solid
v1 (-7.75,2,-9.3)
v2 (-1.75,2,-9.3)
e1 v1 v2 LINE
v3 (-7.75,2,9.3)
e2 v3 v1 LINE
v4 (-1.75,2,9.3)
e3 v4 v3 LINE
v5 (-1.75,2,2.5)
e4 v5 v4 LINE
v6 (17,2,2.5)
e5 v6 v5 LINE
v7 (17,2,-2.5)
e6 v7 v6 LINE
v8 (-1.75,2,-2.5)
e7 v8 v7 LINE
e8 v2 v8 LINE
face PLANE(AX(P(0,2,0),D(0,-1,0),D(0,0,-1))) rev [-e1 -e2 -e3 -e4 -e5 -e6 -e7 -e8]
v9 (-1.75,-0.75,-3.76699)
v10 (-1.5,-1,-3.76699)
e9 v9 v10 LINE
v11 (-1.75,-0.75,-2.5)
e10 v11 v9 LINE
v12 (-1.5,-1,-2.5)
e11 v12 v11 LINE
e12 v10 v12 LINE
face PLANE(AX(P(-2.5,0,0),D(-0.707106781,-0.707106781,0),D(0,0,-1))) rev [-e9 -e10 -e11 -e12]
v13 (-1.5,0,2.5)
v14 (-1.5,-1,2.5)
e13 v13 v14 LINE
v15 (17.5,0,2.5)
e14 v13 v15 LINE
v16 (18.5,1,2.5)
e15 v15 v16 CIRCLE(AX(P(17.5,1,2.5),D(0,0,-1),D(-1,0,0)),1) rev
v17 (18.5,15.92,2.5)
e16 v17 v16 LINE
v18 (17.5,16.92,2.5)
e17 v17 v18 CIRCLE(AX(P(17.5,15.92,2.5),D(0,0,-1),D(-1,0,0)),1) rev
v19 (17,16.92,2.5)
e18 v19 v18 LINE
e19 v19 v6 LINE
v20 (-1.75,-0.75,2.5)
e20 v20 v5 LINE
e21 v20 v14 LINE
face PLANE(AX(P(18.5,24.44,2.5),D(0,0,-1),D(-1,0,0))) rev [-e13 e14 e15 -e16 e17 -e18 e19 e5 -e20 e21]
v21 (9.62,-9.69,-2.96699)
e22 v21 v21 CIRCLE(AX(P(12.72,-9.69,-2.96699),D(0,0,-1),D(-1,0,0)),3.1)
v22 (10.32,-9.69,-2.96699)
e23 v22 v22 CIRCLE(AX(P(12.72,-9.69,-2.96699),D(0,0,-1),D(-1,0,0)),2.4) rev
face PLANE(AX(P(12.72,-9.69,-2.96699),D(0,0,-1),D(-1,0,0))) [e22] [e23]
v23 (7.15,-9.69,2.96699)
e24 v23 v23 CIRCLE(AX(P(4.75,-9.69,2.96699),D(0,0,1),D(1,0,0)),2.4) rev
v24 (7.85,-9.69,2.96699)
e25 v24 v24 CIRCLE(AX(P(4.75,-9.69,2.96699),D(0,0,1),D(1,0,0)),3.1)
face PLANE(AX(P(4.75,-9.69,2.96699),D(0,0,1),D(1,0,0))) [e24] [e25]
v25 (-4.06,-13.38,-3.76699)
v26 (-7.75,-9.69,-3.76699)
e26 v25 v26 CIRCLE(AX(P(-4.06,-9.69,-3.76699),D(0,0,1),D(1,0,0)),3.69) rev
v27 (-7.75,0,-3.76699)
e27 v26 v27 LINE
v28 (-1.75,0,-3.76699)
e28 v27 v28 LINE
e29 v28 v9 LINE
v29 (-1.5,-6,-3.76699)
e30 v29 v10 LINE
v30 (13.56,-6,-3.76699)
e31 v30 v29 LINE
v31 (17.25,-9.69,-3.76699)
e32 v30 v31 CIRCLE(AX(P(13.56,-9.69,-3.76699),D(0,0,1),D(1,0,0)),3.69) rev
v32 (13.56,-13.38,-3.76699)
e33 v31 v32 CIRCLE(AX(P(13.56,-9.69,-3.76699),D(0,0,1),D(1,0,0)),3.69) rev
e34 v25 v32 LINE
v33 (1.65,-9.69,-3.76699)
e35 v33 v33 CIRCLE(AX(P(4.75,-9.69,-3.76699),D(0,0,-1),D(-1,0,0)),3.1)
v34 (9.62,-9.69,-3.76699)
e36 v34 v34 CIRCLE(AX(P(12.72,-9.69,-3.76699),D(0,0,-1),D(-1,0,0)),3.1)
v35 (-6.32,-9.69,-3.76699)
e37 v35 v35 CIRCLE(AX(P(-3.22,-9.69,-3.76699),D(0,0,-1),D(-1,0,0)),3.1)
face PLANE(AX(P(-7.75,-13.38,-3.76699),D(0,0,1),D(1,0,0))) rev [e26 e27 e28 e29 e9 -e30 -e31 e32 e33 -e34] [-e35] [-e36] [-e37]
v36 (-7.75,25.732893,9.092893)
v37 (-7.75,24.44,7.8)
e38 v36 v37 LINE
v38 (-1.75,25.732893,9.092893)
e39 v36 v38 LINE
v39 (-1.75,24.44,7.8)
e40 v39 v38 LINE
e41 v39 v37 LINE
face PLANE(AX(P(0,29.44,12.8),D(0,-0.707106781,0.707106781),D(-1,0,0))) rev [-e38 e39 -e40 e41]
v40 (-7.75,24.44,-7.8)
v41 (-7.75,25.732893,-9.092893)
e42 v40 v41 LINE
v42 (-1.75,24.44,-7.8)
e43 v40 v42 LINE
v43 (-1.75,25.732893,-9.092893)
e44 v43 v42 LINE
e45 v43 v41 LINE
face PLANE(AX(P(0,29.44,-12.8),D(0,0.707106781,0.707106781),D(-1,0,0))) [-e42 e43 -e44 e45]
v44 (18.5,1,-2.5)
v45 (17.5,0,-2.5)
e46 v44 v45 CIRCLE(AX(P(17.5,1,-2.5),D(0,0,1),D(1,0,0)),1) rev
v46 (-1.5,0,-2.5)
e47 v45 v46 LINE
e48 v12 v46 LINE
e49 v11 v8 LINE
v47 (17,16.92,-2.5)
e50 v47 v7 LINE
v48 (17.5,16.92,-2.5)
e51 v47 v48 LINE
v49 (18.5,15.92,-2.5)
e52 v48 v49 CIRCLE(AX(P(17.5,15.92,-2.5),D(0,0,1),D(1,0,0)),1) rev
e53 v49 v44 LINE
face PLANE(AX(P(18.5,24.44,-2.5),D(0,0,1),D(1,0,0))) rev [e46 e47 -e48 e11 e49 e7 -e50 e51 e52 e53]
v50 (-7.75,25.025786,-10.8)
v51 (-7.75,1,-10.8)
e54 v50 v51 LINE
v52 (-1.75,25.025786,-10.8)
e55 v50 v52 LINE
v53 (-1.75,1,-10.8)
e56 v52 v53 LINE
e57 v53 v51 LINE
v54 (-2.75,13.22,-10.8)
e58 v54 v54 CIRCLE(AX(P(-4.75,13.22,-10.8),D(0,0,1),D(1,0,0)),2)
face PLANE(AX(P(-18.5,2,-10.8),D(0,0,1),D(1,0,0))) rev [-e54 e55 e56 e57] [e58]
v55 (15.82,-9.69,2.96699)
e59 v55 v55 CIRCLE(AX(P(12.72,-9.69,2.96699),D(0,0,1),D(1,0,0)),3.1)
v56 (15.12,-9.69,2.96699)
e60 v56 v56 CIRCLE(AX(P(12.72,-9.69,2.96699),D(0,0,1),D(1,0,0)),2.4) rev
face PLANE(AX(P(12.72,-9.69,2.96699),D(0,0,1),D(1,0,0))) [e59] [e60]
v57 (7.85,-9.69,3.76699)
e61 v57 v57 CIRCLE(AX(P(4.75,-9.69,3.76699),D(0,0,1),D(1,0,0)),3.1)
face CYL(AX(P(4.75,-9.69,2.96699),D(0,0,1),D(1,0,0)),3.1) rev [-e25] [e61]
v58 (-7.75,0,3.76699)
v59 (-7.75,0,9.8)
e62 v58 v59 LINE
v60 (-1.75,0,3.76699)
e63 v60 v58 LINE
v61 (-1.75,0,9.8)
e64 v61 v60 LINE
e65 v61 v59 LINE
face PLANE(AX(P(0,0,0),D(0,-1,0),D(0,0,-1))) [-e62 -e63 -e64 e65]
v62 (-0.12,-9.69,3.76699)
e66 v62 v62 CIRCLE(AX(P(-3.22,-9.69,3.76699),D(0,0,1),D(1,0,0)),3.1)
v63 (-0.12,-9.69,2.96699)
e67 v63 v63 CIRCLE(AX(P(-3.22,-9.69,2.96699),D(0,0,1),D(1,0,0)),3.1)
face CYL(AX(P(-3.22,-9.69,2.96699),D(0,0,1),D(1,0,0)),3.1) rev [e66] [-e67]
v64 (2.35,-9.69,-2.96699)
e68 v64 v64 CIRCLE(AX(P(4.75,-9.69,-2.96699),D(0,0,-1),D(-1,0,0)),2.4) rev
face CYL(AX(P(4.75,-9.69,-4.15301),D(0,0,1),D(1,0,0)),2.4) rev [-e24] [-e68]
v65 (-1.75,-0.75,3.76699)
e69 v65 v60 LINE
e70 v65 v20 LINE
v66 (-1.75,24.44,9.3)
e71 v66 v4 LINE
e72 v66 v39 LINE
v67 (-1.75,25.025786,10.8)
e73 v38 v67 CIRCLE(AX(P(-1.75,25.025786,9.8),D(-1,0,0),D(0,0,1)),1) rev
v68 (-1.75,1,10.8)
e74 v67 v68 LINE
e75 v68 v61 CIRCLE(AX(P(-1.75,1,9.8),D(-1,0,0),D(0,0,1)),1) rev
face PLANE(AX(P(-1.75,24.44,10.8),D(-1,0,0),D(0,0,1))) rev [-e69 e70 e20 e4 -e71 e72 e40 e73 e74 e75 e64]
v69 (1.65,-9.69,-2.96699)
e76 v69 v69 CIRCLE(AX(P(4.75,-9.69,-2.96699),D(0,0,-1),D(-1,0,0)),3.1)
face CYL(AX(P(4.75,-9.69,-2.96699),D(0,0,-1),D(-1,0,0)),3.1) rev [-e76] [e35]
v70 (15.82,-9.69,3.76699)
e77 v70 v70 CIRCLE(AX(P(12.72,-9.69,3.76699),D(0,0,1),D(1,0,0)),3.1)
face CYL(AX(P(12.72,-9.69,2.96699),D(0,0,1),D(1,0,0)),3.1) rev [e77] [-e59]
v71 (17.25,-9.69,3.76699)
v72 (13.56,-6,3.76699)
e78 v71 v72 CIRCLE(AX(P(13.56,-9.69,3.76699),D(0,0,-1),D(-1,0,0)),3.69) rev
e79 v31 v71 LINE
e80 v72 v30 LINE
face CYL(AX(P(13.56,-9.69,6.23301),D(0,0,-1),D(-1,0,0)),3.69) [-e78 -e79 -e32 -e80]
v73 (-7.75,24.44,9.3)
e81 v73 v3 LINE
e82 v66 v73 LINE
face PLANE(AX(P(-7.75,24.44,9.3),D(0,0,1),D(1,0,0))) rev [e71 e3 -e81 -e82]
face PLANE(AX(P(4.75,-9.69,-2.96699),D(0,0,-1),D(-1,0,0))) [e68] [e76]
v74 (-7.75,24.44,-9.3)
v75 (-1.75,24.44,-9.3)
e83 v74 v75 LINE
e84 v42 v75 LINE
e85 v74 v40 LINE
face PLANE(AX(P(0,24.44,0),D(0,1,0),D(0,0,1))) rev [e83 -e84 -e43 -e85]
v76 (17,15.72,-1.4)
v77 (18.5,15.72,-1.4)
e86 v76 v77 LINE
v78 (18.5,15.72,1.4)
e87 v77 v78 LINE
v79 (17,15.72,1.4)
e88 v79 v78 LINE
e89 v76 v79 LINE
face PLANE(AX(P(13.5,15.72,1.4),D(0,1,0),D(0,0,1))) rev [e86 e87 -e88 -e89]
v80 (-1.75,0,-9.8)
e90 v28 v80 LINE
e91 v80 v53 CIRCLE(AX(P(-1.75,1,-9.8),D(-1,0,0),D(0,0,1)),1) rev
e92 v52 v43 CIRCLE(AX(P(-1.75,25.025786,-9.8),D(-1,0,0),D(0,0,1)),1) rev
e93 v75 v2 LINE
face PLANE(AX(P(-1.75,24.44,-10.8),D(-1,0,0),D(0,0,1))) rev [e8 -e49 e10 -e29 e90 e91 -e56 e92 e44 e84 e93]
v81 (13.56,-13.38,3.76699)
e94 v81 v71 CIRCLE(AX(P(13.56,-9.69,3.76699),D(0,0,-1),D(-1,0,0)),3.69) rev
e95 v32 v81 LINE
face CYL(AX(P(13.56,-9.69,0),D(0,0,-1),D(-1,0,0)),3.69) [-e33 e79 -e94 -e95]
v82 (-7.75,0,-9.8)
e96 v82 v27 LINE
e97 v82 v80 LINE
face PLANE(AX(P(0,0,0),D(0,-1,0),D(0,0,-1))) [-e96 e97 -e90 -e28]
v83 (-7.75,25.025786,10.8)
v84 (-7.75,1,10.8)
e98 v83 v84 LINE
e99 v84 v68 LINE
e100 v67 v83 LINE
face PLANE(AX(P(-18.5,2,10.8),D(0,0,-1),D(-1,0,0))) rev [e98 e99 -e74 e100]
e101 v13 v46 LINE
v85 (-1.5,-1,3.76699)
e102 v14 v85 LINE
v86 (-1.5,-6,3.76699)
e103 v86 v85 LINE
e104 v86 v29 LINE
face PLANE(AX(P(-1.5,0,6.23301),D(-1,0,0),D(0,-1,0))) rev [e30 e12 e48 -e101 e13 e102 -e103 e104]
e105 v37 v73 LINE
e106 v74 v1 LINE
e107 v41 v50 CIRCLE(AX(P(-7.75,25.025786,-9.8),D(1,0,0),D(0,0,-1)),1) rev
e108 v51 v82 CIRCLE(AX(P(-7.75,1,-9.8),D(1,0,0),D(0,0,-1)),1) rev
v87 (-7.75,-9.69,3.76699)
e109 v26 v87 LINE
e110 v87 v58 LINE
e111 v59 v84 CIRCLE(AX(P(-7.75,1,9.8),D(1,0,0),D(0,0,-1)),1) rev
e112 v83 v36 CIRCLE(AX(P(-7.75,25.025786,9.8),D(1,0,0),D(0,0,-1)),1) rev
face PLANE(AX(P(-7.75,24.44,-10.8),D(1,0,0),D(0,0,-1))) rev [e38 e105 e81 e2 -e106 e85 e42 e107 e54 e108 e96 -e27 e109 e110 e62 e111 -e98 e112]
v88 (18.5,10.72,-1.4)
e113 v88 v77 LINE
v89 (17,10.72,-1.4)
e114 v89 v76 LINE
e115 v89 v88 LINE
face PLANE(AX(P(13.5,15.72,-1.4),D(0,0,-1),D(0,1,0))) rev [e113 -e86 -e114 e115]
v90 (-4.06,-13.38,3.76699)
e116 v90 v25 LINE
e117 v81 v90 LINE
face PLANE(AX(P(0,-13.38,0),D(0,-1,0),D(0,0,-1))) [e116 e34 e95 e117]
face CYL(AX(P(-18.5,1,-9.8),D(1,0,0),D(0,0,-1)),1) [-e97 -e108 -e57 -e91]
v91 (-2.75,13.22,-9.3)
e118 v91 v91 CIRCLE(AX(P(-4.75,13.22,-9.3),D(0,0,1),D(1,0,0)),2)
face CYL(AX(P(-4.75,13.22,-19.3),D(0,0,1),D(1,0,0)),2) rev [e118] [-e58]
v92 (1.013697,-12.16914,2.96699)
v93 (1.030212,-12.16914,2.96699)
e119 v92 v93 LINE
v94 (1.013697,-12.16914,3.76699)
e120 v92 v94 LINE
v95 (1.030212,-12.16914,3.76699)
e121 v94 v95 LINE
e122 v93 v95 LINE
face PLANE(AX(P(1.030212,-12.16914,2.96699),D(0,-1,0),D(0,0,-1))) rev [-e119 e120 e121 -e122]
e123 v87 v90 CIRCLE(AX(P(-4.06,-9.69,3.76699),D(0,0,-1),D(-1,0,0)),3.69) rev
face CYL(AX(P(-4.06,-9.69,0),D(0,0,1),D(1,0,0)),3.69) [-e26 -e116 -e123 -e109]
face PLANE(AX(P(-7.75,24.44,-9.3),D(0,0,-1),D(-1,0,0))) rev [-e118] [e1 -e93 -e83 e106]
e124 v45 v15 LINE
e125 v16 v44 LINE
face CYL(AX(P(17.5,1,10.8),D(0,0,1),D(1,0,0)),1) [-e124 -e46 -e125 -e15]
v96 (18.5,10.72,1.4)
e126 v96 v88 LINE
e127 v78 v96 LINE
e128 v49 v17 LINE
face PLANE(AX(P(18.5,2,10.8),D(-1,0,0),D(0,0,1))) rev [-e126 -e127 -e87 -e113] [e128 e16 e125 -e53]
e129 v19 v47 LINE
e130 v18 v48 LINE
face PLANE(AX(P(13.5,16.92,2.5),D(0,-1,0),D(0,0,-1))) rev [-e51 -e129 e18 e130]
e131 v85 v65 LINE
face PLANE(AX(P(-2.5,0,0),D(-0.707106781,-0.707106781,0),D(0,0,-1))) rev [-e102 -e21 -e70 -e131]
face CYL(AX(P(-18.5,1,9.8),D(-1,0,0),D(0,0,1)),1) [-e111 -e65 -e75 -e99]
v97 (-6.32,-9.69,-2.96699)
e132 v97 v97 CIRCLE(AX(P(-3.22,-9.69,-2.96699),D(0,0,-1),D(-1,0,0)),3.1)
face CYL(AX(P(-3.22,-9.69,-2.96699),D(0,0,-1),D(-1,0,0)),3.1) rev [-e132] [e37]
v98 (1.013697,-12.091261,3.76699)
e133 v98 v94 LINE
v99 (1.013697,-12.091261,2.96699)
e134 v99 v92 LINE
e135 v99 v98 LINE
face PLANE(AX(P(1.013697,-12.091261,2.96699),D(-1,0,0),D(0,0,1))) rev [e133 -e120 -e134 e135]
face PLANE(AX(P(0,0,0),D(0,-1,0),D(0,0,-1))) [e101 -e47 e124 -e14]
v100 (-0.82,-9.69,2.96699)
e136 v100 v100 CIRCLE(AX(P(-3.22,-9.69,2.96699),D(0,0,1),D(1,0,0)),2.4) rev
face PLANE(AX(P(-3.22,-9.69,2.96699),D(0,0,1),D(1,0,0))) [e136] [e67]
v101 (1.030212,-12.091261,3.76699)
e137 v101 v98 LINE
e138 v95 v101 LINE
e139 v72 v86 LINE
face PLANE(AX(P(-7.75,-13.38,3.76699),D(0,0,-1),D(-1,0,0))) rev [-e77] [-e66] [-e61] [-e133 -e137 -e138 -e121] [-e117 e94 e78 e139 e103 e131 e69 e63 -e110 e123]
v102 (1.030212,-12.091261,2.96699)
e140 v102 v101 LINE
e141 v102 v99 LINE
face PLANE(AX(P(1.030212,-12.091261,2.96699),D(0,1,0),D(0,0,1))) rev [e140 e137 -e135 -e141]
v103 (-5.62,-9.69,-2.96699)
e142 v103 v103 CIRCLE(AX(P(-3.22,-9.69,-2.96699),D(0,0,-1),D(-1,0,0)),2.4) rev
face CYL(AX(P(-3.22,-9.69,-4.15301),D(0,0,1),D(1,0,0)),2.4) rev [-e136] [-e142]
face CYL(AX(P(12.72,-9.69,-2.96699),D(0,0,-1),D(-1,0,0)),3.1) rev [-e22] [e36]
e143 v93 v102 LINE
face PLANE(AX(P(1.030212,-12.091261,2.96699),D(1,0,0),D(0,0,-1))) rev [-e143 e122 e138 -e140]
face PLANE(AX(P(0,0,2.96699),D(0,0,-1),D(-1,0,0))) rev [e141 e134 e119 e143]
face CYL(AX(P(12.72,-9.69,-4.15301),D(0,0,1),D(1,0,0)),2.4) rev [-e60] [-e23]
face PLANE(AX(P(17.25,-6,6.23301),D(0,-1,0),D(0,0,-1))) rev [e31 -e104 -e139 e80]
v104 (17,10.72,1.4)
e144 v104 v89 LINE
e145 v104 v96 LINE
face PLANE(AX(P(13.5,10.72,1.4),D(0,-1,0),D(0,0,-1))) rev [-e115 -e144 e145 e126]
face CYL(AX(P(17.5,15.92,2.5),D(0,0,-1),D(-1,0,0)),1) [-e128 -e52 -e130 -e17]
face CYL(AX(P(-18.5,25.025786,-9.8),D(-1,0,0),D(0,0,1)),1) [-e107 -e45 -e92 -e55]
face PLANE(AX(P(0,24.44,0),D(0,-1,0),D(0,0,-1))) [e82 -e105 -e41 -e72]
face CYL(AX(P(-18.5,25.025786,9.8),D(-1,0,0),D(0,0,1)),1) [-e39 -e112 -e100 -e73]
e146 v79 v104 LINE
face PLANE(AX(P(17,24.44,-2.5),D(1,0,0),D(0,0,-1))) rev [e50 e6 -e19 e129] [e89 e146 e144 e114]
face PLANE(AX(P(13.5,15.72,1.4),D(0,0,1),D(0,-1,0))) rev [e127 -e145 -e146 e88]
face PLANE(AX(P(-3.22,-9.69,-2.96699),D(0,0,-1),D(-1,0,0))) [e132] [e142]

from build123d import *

# Parameters (mm, degrees)
SKETCH1_W           = 37
SKETCH1_H           = 21.6
BOSS_EXTRUDE1_DEPTH = 2
SKETCH2_W           = 6
SKETCH2_H           = 1.5
SKETCH2_W_2         = 1.5
SKETCH2_H_2         = 5
BOSS_EXTRUDE2_DEPTH = 22.44
SKETCH3_W           = 6
SKETCH3_H           = 3
BOSS_EXTRUDE3_DEPTH = 5
CHAMFER1_SIZE       = 5
SKETCH4_W           = 6
SKETCH4_H           = 3
BOSS_EXTRUDE4_DEPTH = 5
CHAMFER2_SIZE       = 5
SKETCH6_W           = 5
SKETCH6_H           = 7.52
SKETCH6_W_2         = 2.8
SKETCH6_H_2         = 5
CUT_EXTRUDE1_DEPTH  = 5
SKETCH8_W           = 20.25
SKETCH8_H           = 8.3
SKETCH8_W_2         = 10.75
SKETCH8_H_2         = 21.6
CUT_EXTRUDE3_DEPTH  = 10
FILLET1_R           = 1
FILLET2_R           = 1
SKETCH9_R           = 2
CUT_EXTRUDE4_DEPTH  = 10
SKETCH13_W          = 25
SKETCH13_H          = 7.533980582
BOSS_EXTRUDE5_DEPTH = 13.38
SKETCH14_R          = 2.4
CUT_EXTRUDE5_DEPTH  = 7.92
SKETCH15_R          = 3.1
SKETCH15_W          = 0.016515358
SKETCH15_H          = 0.077878544
CUT_EXTRUDE6_DEPTH  = 0.8
CUT_EXTRUDE7_START  = -0.8
SKETCH16_R          = 3.1
CUT_EXTRUDE7_DEPTH  = 0.8
SKETCH19_W          = 18.75
SKETCH19_H          = 6
CUT_EXTRUDE8_DEPTH  = 10
FILLET3_R           = 3.69
CHAMFER3_SIZE       = 1
CHAMFER4_SIZE       = 1


# Some blends are built 0.0001 mm under size
with BuildPart() as part:
    # Sketch1 → Boss-Extrude1 (new body)
    with BuildSketch(Plane(origin=(0, 0, 0), x_dir=(1, 0, 0), z_dir=(0, 1, 0))):
        Rectangle(SKETCH1_W, SKETCH1_H)
    extrude(amount=BOSS_EXTRUDE1_DEPTH)

    # Sketch2 → Boss-Extrude2 (add)
    with BuildSketch(Plane(origin=(0, 2, 0), x_dir=(1, 0, 0), z_dir=(0, 1, 0))):
        with Locations((-4.75, 10.05)):
            Rectangle(SKETCH2_W, SKETCH2_H)
        with Locations((-4.75, -10.05)):
            Rectangle(SKETCH2_W, SKETCH2_H)
        with Locations((17.75, 0)):
            Rectangle(SKETCH2_W_2, SKETCH2_H_2)
    extrude(amount=BOSS_EXTRUDE2_DEPTH)

    # Sketch3 → Boss-Extrude3 (add)
    with BuildSketch(Plane(origin=(0, 24.44, 0), x_dir=(1, 0, 0), z_dir=(0, 1, 0))):
        with Locations((-4.75, 9.3)):
            Rectangle(SKETCH3_W, SKETCH3_H)
    extrude(amount=BOSS_EXTRUDE3_DEPTH)

    # Chamfer1
    # the kernel refuses this chamfer: 5 mm, written as the material it takes off along each edge
    with BuildSketch(Plane(origin=(11.10841494, 29.44, -7.8), x_dir=(0, -0.9996219169112968, 0.027495876610586317), z_dir=(-1, 0, 0))) as chamfer1_piece_1:
        Polygon((CHAMFER1_SIZE * 0.999621916911, -CHAMFER1_SIZE * 0.0274958766106), (-CHAMFER1_SIZE * 0.0274958766106, -CHAMFER1_SIZE * 0.999621916911), (0, 0), align=None)
    extrude(amount=31.71682988, mode=Mode.SUBTRACT)

    # Sketch4 → Boss-Extrude4 (add)
    with BuildSketch(Plane(origin=(0, 24.44, 0), x_dir=(1, 0, 0), z_dir=(0, 1, 0))):
        with Locations((-4.75, -9.3)):
            Rectangle(SKETCH4_W, SKETCH4_H)
    extrude(amount=BOSS_EXTRUDE4_DEPTH)

    # Chamfer2
    # the kernel refuses this chamfer: 5 mm, written as the material it takes off along each edge
    with BuildSketch(Plane(origin=(11.10841494, 29.44, 7.8), x_dir=(0, -0.9996219169112968, -0.027495876610586317), z_dir=(-1, 0, 0))) as chamfer2_piece_1:
        Polygon((CHAMFER2_SIZE * 0.999621916911, CHAMFER2_SIZE * 0.0274958766106), (-CHAMFER2_SIZE * 0.0274958766106, CHAMFER2_SIZE * 0.999621916911), (0, 0), align=None)
    extrude(amount=31.71682988, mode=Mode.SUBTRACT)

    # Sketch6 → Cut-Extrude1 (cut)
    with BuildSketch(Plane(origin=(18.5, 0, 0), x_dir=(0, 0, -1), z_dir=(1, 0, 0))):
        with Locations((0, 20.68)):
            Rectangle(SKETCH6_W, SKETCH6_H)
        with Locations((0, 13.22)):
            Rectangle(SKETCH6_W_2, SKETCH6_H_2)
    extrude(amount=-CUT_EXTRUDE1_DEPTH, mode=Mode.SUBTRACT)

    # Sketch8 → Cut-Extrude3 (cut)
    with BuildSketch(Plane(origin=(0, 2, 0), x_dir=(1, 0, 0), z_dir=(0, 1, 0))):
        with Locations((8.375, 6.65)):
            Rectangle(SKETCH8_W, SKETCH8_H)
        with Locations((8.375, -6.65)):
            Rectangle(SKETCH8_W, SKETCH8_H)
        with Locations((-13.125, 0)):
            Rectangle(SKETCH8_W_2, SKETCH8_H_2)
    extrude(amount=-CUT_EXTRUDE3_DEPTH, mode=Mode.SUBTRACT)

    # Fillet1
    fillet1_edges = [part.edges().sort_by_distance(p)[0] for p in [
        (-4.75, 0, -10.8),
        (18.5, 0, 0),
        (-4.75, 0, 10.8),
        (-4.75, 27.44, -10.8),
        (-4.75, 27.44, 10.8),
    ]]
    fillet(fillet1_edges, radius=FILLET1_R)

    # Fillet2
    fillet2_edges = [part.edges().sort_by_distance(p)[0] for p in [
        (18.5, 16.92, 0),
    ]]
    fillet(fillet2_edges, radius=FILLET2_R)

    # Sketch9 → Cut-Extrude4 (cut)
    with BuildSketch(Plane.XY.offset(-9.3)):
        with Locations((-4.75, 13.22)):
            Circle(SKETCH9_R)
    extrude(amount=-CUT_EXTRUDE4_DEPTH, mode=Mode.SUBTRACT)

    # Sketch13 → Boss-Extrude5 (add)
    with BuildSketch(Plane.XZ):
        with Locations((4.75, 0)):
            Rectangle(SKETCH13_W, SKETCH13_H)
    extrude(amount=BOSS_EXTRUDE5_DEPTH)

    # Sketch14 → Cut-Extrude5 (cut)
    with BuildSketch(Plane.XY.offset(3.766990291)):
        with Locations((4.75, -9.69)):
            Circle(SKETCH14_R)
        with Locations((12.72, -9.69)):
            Circle(SKETCH14_R)
        with Locations((-3.22, -9.69)):
            Circle(SKETCH14_R)
    extrude(amount=-CUT_EXTRUDE5_DEPTH, mode=Mode.SUBTRACT)

    # Sketch15 → Cut-Extrude6 (cut)
    with BuildSketch(Plane.XY.offset(3.766990291)):
        with Locations((-3.22, -9.69)):
            Circle(SKETCH15_R)
        with Locations((4.75, -9.69)):
            Circle(SKETCH15_R)
        with Locations((12.72, -9.69)):
            Circle(SKETCH15_R)
        with Locations((1.021954756, -12.130200689)):
            Rectangle(SKETCH15_W, SKETCH15_H)
    extrude(amount=-CUT_EXTRUDE6_DEPTH, mode=Mode.SUBTRACT)

    # Sketch16 → Cut-Extrude7 (cut)
    with BuildSketch(Plane(origin=(0, 0, -3.766990291), x_dir=(-1, 0, 0), z_dir=(0, 0, -1)).offset(CUT_EXTRUDE7_START)):
        with Locations(Location((-4.75, -9.69, 0), (0, 0, 180))):
            Circle(SKETCH16_R)
        with Locations(Location((3.22, -9.69, 0), (0, 0, 180))):
            Circle(SKETCH16_R)
        with Locations(Location((-12.72, -9.69, 0), (0, 0, 180))):
            Circle(SKETCH16_R)
    extrude(amount=CUT_EXTRUDE7_DEPTH, mode=Mode.SUBTRACT)

    # Sketch19 → Cut-Extrude8 (cut)
    with BuildSketch(Plane(origin=(0, 0, -3.766990291), x_dir=(-1, 0, 0), z_dir=(0, 0, -1))):
        with Locations((-7.875, -3)):
            Rectangle(SKETCH19_W, SKETCH19_H)
    extrude(amount=-CUT_EXTRUDE8_DEPTH, mode=Mode.SUBTRACT)

    # Fillet3
    fillet3_edges = [part.edges().sort_by_distance(p)[0] for p in [
        (-7.75, -13.38, 0),
        (17.25, -13.38, 0),
        (17.25, -6, 0),
    ]]
    fillet(fillet3_edges, radius=FILLET3_R - 0.0001)  # a hair under: the kernel refuses the full size

    # Chamfer3
    # the kernel refuses this chamfer: 1 mm, written as the material it takes off along each edge
    with BuildSketch(Plane(origin=(-1.5, 0, -6.338673279), x_dir=(0.027495876610586275, -0.9996219169112968, 0), z_dir=(0, 0, 1))) as chamfer3_piece_1_section:
        Polygon((CHAMFER3_SIZE * 0.999621916911, -CHAMFER3_SIZE * 0.0274958766106), (-CHAMFER3_SIZE * 0.0274958766106, -CHAMFER3_SIZE * 0.999621916911), (0, 0), align=None)
    chamfer3_piece_1 = extrude(amount=3.838673279, mode=Mode.PRIVATE)
    chamfer3_piece_1 = split(chamfer3_piece_1, bisect_by=Plane(origin=(-1.75, -0.44047619, -3.133495146), z_dir=(1, 0, 0)), keep=Keep.TOP, mode=Mode.PRIVATE)
    add(chamfer3_piece_1, mode=Mode.SUBTRACT)

    # Chamfer4
    # the kernel refuses this chamfer: 1 mm, written as the material it takes off along each edge
    with BuildSketch(Plane(origin=(-1.5, 0, 2.5), x_dir=(-0.9996219169112968, 0.027495876610586358, 0), z_dir=(0, 0, 1))) as chamfer4_piece_1_section:
        Polygon((CHAMFER4_SIZE * 0.999621916911, CHAMFER4_SIZE * 0.0274958766106), (-CHAMFER4_SIZE * 0.0274958766106, CHAMFER4_SIZE * 0.999621916911), (0, 0), align=None)
    chamfer4_piece_1 = extrude(amount=3.838673279, mode=Mode.PRIVATE)
    chamfer4_piece_1 = split(chamfer4_piece_1, bisect_by=Plane(origin=(-1.75, -0.44047619, 3.133495146), z_dir=(1, 0, 0)), keep=Keep.TOP, mode=Mode.PRIVATE)
    add(chamfer4_piece_1, mode=Mode.SUBTRACT)


solid = part.part
